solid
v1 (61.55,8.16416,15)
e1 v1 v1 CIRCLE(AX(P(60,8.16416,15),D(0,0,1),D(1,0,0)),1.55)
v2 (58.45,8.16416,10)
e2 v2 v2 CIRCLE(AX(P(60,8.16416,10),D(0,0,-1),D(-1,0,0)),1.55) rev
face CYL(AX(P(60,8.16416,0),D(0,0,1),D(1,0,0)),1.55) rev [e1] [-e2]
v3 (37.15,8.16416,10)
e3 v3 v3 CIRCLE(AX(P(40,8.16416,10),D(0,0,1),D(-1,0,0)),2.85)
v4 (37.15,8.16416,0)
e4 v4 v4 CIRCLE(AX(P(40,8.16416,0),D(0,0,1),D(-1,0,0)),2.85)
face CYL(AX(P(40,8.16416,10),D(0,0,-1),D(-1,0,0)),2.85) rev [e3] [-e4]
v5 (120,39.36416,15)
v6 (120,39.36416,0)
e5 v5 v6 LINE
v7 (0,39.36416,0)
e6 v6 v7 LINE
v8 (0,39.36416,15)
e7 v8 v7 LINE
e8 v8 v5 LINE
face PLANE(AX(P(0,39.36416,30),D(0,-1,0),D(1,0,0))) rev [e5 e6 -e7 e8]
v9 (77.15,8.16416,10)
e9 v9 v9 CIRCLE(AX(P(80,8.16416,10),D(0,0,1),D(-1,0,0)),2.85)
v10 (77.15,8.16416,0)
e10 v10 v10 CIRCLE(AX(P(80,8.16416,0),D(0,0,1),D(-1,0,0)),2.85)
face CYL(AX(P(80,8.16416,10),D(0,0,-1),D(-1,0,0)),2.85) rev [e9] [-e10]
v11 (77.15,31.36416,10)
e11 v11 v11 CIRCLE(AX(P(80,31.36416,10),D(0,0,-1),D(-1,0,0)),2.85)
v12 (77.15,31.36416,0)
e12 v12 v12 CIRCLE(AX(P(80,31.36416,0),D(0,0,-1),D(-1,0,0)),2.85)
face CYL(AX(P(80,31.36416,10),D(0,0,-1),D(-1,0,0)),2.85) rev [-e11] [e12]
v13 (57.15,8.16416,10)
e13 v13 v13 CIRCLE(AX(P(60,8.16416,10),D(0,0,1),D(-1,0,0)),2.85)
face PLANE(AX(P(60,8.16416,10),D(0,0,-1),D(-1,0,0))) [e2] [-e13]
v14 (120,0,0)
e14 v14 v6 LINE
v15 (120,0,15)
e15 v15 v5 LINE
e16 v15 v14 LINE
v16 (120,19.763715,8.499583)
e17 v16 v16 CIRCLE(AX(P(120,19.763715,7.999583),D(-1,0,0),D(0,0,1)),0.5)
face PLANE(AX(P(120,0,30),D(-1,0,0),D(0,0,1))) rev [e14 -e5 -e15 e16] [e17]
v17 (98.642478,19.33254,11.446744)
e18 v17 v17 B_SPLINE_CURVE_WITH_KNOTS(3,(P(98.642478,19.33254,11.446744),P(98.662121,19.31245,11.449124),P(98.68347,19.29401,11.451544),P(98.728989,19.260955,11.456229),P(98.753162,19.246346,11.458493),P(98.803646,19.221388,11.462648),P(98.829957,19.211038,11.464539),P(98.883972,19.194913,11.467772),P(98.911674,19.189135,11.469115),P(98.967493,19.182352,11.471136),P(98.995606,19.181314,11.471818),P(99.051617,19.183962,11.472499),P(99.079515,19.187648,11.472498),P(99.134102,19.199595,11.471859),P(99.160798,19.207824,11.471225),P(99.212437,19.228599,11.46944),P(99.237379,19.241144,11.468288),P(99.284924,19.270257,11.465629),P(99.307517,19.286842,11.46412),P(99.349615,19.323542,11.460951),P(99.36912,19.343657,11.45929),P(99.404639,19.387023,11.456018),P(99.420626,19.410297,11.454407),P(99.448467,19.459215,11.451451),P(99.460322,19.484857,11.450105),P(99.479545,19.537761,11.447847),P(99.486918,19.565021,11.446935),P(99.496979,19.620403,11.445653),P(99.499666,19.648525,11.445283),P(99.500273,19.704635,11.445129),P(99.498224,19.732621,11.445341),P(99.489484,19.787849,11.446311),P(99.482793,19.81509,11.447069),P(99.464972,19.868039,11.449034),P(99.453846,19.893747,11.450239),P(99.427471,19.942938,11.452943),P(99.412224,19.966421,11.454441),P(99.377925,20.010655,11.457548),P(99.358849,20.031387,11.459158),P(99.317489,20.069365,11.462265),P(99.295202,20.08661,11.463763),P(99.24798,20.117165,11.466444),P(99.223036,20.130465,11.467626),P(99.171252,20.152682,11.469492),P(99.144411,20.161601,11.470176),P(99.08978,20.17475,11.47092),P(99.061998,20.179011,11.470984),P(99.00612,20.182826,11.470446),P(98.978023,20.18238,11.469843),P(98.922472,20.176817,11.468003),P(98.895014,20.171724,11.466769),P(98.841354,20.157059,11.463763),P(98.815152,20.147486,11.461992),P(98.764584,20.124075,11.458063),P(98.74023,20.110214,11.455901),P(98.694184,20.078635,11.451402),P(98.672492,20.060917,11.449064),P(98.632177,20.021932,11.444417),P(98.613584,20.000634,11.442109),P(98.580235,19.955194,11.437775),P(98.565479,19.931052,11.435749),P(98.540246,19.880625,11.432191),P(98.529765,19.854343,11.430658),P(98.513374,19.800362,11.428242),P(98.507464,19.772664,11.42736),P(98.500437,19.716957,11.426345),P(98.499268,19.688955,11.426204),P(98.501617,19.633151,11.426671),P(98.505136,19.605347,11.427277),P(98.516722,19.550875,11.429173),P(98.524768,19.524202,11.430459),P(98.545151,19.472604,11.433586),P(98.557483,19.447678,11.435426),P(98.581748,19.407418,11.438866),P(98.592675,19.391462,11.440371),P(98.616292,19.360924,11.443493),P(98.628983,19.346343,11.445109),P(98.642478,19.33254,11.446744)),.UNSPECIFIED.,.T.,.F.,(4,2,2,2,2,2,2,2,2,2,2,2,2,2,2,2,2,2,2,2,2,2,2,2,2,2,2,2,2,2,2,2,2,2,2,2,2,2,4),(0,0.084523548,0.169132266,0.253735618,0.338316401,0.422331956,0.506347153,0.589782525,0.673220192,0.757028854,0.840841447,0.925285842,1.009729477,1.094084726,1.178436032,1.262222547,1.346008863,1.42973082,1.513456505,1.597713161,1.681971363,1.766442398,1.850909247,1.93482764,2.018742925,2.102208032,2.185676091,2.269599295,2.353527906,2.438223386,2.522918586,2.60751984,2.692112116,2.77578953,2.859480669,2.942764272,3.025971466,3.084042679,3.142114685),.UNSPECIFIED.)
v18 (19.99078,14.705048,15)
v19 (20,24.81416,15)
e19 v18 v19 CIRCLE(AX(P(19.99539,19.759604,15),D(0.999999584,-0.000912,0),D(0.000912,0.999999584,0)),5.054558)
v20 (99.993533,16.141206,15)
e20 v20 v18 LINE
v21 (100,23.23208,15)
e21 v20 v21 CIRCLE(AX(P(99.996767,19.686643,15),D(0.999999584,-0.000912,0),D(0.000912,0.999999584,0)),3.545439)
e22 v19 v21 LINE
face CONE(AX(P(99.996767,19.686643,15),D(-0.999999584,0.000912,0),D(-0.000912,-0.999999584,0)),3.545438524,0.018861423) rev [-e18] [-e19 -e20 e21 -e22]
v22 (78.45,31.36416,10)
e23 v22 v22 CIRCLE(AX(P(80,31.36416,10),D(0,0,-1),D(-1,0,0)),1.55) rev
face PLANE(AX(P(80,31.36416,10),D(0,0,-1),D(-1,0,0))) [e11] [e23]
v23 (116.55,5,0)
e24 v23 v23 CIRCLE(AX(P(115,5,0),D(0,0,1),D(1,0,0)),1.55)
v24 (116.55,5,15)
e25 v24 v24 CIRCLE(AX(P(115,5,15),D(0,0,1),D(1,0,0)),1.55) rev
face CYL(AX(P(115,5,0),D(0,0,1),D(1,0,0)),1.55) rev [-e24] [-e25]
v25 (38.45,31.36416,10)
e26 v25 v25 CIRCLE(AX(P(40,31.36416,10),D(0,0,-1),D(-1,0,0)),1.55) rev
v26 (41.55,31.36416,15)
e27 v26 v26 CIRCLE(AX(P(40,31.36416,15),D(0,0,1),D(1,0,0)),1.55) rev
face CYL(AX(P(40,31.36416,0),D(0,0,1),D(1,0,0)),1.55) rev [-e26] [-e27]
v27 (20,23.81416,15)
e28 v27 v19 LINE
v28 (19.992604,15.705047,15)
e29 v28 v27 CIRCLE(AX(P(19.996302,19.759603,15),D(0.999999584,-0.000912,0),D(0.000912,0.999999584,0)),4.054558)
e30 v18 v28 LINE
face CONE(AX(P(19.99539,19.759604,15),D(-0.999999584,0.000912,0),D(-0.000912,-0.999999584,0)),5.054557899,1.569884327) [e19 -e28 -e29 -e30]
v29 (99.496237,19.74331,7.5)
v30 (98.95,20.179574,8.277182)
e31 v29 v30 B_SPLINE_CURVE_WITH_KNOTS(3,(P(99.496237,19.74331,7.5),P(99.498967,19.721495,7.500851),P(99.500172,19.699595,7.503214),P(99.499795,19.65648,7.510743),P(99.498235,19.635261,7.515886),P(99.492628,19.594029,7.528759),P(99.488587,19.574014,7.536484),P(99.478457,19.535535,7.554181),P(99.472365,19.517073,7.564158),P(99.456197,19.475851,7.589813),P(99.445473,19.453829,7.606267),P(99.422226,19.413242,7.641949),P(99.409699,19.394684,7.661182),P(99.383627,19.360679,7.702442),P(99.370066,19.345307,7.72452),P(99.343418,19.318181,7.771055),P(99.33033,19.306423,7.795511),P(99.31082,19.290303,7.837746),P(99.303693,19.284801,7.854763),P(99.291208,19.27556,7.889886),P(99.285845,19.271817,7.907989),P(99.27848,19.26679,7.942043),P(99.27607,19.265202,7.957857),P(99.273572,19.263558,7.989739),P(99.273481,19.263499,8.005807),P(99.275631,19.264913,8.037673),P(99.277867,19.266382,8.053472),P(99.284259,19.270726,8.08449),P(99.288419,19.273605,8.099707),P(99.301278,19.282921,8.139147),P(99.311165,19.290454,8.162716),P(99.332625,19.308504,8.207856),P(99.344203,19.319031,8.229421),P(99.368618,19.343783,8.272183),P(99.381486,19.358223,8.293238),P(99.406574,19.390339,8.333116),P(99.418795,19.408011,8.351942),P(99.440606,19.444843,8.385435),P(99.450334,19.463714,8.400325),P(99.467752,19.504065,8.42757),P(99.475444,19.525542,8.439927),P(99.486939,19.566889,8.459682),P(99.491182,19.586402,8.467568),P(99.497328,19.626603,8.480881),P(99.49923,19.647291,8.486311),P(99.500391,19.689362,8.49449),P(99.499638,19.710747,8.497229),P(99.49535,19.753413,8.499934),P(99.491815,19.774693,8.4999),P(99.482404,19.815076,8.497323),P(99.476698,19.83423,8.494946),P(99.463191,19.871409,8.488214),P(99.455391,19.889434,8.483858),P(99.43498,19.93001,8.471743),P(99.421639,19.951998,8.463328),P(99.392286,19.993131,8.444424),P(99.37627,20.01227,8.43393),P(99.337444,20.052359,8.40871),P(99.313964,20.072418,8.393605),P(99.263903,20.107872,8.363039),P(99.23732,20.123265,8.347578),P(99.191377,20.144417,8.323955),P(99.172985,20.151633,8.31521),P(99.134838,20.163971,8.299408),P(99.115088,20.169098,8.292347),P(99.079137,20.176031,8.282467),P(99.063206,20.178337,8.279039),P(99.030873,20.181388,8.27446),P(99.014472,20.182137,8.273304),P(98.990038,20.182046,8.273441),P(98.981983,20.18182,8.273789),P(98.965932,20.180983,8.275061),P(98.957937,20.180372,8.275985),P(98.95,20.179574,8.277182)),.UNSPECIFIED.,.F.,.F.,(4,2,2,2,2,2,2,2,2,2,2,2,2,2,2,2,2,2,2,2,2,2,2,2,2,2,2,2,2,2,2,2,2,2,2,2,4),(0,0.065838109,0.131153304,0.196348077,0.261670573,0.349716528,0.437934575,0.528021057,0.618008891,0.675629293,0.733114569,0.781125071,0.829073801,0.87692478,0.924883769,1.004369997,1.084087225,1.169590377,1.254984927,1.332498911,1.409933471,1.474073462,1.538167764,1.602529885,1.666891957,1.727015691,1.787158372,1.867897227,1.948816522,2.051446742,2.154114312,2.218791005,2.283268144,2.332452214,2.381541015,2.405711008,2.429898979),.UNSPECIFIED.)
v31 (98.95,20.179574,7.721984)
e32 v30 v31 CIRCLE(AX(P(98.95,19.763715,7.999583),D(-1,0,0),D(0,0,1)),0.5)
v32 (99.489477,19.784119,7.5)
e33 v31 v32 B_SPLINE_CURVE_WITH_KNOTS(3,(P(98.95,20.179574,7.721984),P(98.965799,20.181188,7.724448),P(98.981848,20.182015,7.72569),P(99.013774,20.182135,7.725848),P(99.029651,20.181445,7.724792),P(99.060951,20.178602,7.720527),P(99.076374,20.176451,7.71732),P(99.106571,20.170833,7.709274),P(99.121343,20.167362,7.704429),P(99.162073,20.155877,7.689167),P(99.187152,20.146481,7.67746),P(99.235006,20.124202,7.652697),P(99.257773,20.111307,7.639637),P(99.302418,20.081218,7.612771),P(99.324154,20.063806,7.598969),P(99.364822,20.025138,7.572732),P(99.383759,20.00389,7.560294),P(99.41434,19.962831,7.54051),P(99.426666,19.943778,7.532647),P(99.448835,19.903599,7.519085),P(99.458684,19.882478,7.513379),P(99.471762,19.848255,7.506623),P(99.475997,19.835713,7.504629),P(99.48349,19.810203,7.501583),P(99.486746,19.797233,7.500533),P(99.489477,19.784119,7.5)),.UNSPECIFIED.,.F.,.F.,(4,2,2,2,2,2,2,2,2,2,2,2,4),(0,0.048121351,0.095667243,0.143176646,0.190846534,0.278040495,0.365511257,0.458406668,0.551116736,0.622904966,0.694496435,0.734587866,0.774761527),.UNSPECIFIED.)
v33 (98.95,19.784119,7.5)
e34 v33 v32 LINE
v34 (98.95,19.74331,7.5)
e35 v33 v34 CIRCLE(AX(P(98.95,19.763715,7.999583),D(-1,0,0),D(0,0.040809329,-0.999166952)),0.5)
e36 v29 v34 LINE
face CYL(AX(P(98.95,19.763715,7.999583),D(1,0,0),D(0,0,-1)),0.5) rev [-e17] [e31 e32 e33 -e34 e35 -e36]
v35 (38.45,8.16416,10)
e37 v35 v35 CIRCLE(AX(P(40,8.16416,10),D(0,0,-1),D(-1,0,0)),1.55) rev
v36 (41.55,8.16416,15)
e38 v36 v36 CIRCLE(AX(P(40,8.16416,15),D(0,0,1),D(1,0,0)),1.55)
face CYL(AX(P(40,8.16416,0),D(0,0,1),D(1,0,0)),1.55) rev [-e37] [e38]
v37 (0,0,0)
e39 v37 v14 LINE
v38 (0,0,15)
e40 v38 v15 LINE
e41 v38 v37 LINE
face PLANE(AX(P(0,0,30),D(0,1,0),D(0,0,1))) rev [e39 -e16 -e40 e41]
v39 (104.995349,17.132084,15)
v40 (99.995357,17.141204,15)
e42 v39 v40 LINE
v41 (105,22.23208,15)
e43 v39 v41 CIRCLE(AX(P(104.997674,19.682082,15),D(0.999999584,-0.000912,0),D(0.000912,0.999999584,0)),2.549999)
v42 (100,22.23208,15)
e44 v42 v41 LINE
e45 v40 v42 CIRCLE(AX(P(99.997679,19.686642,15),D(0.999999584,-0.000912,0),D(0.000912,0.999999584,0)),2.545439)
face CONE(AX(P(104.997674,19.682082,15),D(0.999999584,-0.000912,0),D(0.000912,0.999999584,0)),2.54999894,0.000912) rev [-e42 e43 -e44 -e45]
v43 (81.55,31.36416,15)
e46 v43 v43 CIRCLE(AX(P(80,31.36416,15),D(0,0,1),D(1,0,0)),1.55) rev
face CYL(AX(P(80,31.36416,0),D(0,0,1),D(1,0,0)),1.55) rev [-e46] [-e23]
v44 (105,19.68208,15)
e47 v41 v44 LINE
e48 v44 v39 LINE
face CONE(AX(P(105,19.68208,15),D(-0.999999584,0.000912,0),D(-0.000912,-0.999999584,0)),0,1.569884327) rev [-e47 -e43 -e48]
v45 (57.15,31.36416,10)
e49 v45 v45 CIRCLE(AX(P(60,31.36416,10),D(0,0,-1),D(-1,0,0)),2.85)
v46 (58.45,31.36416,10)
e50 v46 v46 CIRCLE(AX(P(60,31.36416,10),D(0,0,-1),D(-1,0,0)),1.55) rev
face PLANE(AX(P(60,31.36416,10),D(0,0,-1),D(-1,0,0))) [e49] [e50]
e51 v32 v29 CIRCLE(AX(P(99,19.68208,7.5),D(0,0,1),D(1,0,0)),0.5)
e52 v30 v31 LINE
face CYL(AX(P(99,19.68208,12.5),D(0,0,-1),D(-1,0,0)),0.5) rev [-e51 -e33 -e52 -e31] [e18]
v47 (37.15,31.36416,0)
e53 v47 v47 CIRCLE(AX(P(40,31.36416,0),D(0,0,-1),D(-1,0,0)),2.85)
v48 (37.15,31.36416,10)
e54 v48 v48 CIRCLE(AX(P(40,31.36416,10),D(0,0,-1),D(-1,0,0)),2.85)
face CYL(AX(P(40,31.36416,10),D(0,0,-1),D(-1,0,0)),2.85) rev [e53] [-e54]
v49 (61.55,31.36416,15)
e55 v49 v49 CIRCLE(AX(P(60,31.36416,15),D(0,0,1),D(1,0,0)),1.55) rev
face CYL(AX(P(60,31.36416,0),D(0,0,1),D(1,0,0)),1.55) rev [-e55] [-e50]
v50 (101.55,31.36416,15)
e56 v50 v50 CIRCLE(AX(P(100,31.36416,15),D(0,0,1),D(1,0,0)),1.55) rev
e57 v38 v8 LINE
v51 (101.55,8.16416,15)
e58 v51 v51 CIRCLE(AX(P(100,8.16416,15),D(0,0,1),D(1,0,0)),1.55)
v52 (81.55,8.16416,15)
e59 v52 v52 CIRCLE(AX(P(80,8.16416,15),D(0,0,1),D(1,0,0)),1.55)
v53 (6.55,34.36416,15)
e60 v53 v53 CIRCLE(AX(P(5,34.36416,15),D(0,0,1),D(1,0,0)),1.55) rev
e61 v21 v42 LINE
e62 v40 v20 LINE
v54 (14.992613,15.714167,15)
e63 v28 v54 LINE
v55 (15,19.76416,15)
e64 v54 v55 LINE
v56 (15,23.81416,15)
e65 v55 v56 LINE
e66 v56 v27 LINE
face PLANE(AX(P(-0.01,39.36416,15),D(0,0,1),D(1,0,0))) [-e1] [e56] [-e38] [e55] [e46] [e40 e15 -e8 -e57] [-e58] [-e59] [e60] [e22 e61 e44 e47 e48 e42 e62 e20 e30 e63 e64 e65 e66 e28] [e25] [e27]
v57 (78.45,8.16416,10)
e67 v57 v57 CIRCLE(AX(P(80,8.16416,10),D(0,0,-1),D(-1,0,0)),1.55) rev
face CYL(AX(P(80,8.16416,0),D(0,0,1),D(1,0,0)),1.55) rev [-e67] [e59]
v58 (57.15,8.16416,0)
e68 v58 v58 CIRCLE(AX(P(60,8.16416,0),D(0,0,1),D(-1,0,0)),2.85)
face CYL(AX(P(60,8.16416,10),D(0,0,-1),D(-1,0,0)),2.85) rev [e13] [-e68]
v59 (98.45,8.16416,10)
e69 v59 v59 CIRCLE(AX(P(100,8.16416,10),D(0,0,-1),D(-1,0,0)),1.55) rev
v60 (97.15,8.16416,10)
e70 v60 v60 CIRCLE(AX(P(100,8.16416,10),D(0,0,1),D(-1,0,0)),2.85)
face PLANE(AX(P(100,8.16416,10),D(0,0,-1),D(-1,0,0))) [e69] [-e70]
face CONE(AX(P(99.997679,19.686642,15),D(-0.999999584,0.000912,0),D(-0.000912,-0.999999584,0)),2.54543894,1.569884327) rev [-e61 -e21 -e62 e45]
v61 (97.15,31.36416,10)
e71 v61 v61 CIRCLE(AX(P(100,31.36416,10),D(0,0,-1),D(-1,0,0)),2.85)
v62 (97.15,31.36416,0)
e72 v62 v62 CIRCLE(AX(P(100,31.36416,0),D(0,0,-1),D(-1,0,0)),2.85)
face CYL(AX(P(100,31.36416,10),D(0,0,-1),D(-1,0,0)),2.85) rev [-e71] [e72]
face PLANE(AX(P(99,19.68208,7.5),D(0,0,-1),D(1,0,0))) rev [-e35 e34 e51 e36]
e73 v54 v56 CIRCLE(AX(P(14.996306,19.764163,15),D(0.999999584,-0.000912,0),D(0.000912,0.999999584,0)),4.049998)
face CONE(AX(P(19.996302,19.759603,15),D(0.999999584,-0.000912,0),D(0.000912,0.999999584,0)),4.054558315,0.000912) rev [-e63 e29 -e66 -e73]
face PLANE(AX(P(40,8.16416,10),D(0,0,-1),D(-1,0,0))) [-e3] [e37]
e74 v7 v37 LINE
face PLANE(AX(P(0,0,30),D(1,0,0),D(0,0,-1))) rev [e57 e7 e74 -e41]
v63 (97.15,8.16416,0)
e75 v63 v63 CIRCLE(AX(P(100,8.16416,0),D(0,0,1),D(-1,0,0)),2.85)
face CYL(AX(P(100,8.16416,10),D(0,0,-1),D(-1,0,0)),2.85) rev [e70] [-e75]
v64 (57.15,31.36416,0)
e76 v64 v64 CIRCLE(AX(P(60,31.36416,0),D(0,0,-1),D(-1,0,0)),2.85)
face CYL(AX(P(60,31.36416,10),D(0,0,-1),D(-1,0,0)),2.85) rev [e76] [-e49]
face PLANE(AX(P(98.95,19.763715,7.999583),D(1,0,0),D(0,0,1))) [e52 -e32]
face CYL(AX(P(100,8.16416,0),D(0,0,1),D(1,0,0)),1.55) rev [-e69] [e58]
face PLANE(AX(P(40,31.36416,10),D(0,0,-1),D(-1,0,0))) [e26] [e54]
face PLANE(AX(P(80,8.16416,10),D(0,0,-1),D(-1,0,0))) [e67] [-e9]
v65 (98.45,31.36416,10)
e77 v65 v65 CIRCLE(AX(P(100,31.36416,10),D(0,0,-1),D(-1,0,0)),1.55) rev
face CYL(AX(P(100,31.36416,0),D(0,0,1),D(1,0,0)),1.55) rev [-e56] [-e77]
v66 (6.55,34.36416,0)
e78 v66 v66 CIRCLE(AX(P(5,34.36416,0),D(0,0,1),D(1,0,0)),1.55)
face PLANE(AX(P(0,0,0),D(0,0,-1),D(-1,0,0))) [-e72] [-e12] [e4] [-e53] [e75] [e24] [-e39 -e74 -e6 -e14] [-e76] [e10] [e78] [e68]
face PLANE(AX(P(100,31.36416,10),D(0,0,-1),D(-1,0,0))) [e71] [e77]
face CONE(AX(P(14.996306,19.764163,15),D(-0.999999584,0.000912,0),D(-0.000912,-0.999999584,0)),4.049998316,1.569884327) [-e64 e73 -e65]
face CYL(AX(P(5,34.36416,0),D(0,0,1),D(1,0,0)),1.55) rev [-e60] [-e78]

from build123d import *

# Parameters (mm, degrees)
SKIZZE2_W                        = 120
SKIZZE2_H                        = 39.364160046
AUFSATZ_LINEAR_AUSTRAGEN1_DEPTH  = 30
SKIZZE24_R                       = 1.55
SCHNITT_LINEAR_AUSTRAGEN4_DEPTH  = 130.805766806
SKIZZE46_R                       = 2.85
SCHNITT_LINEAR_AUSTRAGEN15_DEPTH = 10
SCHNITT_LINEAR_START             = -5
SCHNITT_LINEAR_AUSTRAGEN25_DEPTH = 2.7
LINEARES_MUSTER1_COUNT           = 4
LINEARES_MUSTER1_PITCH           = 20
SPIEGELN2_COPY_1_SKETCH_R        = 2.85
SPIEGELN2_COPY_1_DEPTH           = 10
SPIEGELN2_COPY_2_SKETCH_R        = 2.85
SPIEGELN2_COPY_2_DEPTH           = 10
SPIEGELN2_COPY_3_SKETCH_R        = 2.85
SPIEGELN2_COPY_3_DEPTH           = 10
SPIEGELN2_START                  = -5
SPIEGELN2_COPY_4_DEPTH           = 2.7
SPIEGELN2_COPY_5_DEPTH           = 2.7
SPIEGELN2_COPY_6_DEPTH           = 2.7
SKIZZE51_R                       = 1.55
SCHNITT_LINEAR_AUSTRAGEN26_DEPTH = 130.805766806
SKIZZE75_R                       = 0.75
SCHNITT_LINEAR_AUSTRAGEN28_DEPTH = 12
SKIZZE76_R                       = 2
SCHNITT_LINEAR_AUSTRAGEN29_DEPTH = 6
SKIZZE80_R                       = 0.5
SCHNITT_LINEAR_AUSTRAGEN34_DEPTH = 21.05
SCHNITT_LINEAR_START_2           = -7.5
SKIZZE81_R                       = 0.5
SCHNITT_LINEAR_AUSTRAGEN36_DEPTH = 5
FASE1_SIZE                       = 1
ABSPALTEN3_START                 = 15
ABSPALTEN3_OUTLINE_W             = 120
ABSPALTEN3_OUTLINE_H             = 39.364160046
ABSPALTEN3_OUTLINE_R             = 1.55
ABSPALTEN3_OUTLINE_R_2           = 0.75
ABSPALTEN3_DEPTH                 = 15


# Read off the part's stored shape, not the designer's step: Abspalten3
with BuildPart() as part:
    # Skizze2 → Aufsatz-Linear austragen1 (new body)
    with BuildSketch(Plane.XY):
        with Locations((60, 19.682080023)):
            Rectangle(SKIZZE2_W, SKIZZE2_H)
    extrude(amount=AUFSATZ_LINEAR_AUSTRAGEN1_DEPTH)

    # Skizze24 → Schnitt-Linear austragen4 (cut, through all)
    with BuildSketch(Plane.XY.offset(30)):
        with Locations((40, 31.364160046)):
            Circle(SKIZZE24_R)
        with Locations((60, 31.364160046)):
            Circle(SKIZZE24_R)
        with Locations((80, 31.364160046)):
            Circle(SKIZZE24_R)
        with Locations((100, 31.364160046)):
            Circle(SKIZZE24_R)
    schnitt_linear_austragen4 = extrude(amount=-SCHNITT_LINEAR_AUSTRAGEN4_DEPTH, mode=Mode.SUBTRACT)

    # Skizze46 → Schnitt-Linear austragen15 (cut)
    with BuildSketch(Plane(origin=(0, 0, 0), x_dir=(-1, 0, 0), z_dir=(0, 0, -1))):
        with Locations((-100, 31.364160046)):
            Circle(SKIZZE46_R)
    schnitt_linear_austragen15 = extrude(amount=-SCHNITT_LINEAR_AUSTRAGEN15_DEPTH, mode=Mode.SUBTRACT)

    # Skizze50 → Schnitt-Linear austragen25 (cut)
    with BuildSketch(Plane.XY.offset(30).offset(SCHNITT_LINEAR_START)):
        Polygon((97.15, 33.009608314), (97.15, 39.364160046), (102.85, 39.364160046), (102.85, 33.009608314), (102.85, 29.718711779), (100, 28.073263512), (97.15, 29.718711779), align=None)
    schnitt_linear_austragen25 = extrude(amount=-SCHNITT_LINEAR_AUSTRAGEN25_DEPTH, mode=Mode.SUBTRACT)

    # Lineares Muster1: Schnitt-Linear austragen15, Schnitt-Linear austragen25 ×4
    with Locations(*[(-i * LINEARES_MUSTER1_PITCH, 0, 0) for i in range(1, LINEARES_MUSTER1_COUNT)]):
        add(schnitt_linear_austragen15, mode=Mode.SUBTRACT)
        add(schnitt_linear_austragen25, mode=Mode.SUBTRACT)

    # Spiegeln2: Schnitt-Linear austragen15, Schnitt-Linear austragen25 across plane
    add(schnitt_linear_austragen15.mirror(Plane.ZX.offset(19.764160046)), mode=Mode.SUBTRACT)
    add(schnitt_linear_austragen25.mirror(Plane.ZX.offset(19.764160046)), mode=Mode.SUBTRACT)

    # Spiegeln2 copy 1 sketch → Spiegeln2 copy 1 (cut)
    with BuildSketch(Plane(origin=(-20, 39.528320093, 0), x_dir=(-1, 0, 0), z_dir=(0, 0, -1))):
        with Locations((-100, -31.364160046)):
            Circle(SPIEGELN2_COPY_1_SKETCH_R)
    extrude(amount=-SPIEGELN2_COPY_1_DEPTH, mode=Mode.SUBTRACT)

    # Spiegeln2 copy 2 sketch → Spiegeln2 copy 2 (cut)
    with BuildSketch(Plane(origin=(-40, 39.528320093, 0), x_dir=(-1, 0, 0), z_dir=(0, 0, -1))):
        with Locations((-100, -31.364160046)):
            Circle(SPIEGELN2_COPY_2_SKETCH_R)
    extrude(amount=-SPIEGELN2_COPY_2_DEPTH, mode=Mode.SUBTRACT)

    # Spiegeln2 copy 3 sketch → Spiegeln2 copy 3 (cut)
    with BuildSketch(Plane(origin=(-60, 39.528320093, 0), x_dir=(-1, 0, 0), z_dir=(0, 0, -1))):
        with Locations((-100, -31.364160046)):
            Circle(SPIEGELN2_COPY_3_SKETCH_R)
    extrude(amount=-SPIEGELN2_COPY_3_DEPTH, mode=Mode.SUBTRACT)

    # Spiegeln2 copy 4 sketch → Spiegeln2 copy 4 (cut)
    with BuildSketch(Plane(origin=(-20, 39.528320093, 30), x_dir=(1, 0, 0), z_dir=(0, 0, 1)).offset(SPIEGELN2_START)):
        Polygon((97.15, -33.009608314), (97.15, -39.364160046), (102.85, -39.364160046), (102.85, -33.009608314), (102.85, -29.718711779), (100, -28.073263512), (97.15, -29.718711779), align=None)
    extrude(amount=-SPIEGELN2_COPY_4_DEPTH, mode=Mode.SUBTRACT)

    # Spiegeln2 copy 5 sketch → Spiegeln2 copy 5 (cut)
    with BuildSketch(Plane(origin=(-40, 39.528320093, 30), x_dir=(1, 0, 0), z_dir=(0, 0, 1)).offset(SPIEGELN2_START)):
        Polygon((97.15, -33.009608314), (97.15, -39.364160046), (102.85, -39.364160046), (102.85, -33.009608314), (102.85, -29.718711779), (100, -28.073263512), (97.15, -29.718711779), align=None)
    extrude(amount=-SPIEGELN2_COPY_5_DEPTH, mode=Mode.SUBTRACT)

    # Spiegeln2 copy 6 sketch → Spiegeln2 copy 6 (cut)
    with BuildSketch(Plane(origin=(-60, 39.528320093, 30), x_dir=(1, 0, 0), z_dir=(0, 0, 1)).offset(SPIEGELN2_START)):
        Polygon((97.15, -33.009608314), (97.15, -39.364160046), (102.85, -39.364160046), (102.85, -33.009608314), (102.85, -29.718711779), (100, -28.073263512), (97.15, -29.718711779), align=None)
    extrude(amount=-SPIEGELN2_COPY_6_DEPTH, mode=Mode.SUBTRACT)

    # Spiegeln3: Schnitt-Linear austragen4 across plane
    add(schnitt_linear_austragen4.mirror(Plane.ZX.offset(19.764160046)), mode=Mode.SUBTRACT)

    # Skizze51 → Schnitt-Linear austragen26 (cut, through all)
    with BuildSketch(Plane.XY.offset(30)):
        with Locations((5, 34.364160046)):
            Circle(SKIZZE51_R)
        with Locations((115, 5)):
            Circle(SKIZZE51_R)
    extrude(amount=-SCHNITT_LINEAR_AUSTRAGEN26_DEPTH, mode=Mode.SUBTRACT)

    # Skizze73 → Schnitt-Rotation5 (revolve, cut)
    with BuildSketch(Plane.XY.offset(15)):
        Polygon((15, 19.764160046), (15, 23.814160046), (20, 23.814160046), (20, 24.814160046), (100, 23.232080023), (100, 22.232080023), (105, 22.232080023), (105, 19.682080023), align=None)
    revolve(axis=Axis((105, 19.682080023, 15), (-0.9999995841280241, 0.0009119998787298228, 0)), mode=Mode.SUBTRACT)

    # Skizze75 → Schnitt-Linear austragen28 (cut)
    with BuildSketch(Plane.XY.offset(30)):
        with Locations((21.598259807, 19.682080023)):
            Circle(SKIZZE75_R)
    extrude(amount=-SCHNITT_LINEAR_AUSTRAGEN28_DEPTH, mode=Mode.SUBTRACT)

    # Skizze76 → Schnitt-Linear austragen29 (cut)
    with BuildSketch(Plane.XY.offset(30)):
        with Locations((21.598259807, 19.682080023)):
            Circle(SKIZZE76_R)
    extrude(amount=-SCHNITT_LINEAR_AUSTRAGEN29_DEPTH, mode=Mode.SUBTRACT)

    # Skizze80 → Schnitt-Linear austragen34 (cut)
    with BuildSketch(Plane(origin=(120, 0, 0), x_dir=(0, 0, -1), z_dir=(1, 0, 0))):
        with Locations((-22.000416524, 19.763714623)):
            Circle(SKIZZE80_R)
    schnitt_linear_austragen34 = extrude(amount=-SCHNITT_LINEAR_AUSTRAGEN34_DEPTH, mode=Mode.SUBTRACT)

    # Skizze81 → Schnitt-Linear austragen36 (cut)
    with BuildSketch(Plane.XY.offset(30).offset(SCHNITT_LINEAR_START_2)):
        with Locations(Location((99, 19.682080023, 0), (0, 0, 7.034090001))):
            Circle(SKIZZE81_R)
    schnitt_linear_austragen36 = extrude(amount=-SCHNITT_LINEAR_AUSTRAGEN36_DEPTH, mode=Mode.SUBTRACT)

    # Spiegeln4: Schnitt-Linear austragen34, Schnitt-Linear austragen36 across plane
    add(schnitt_linear_austragen34.mirror(Plane.XY.offset(15)), mode=Mode.SUBTRACT)
    add(schnitt_linear_austragen36.mirror(Plane.XY.offset(15)), mode=Mode.SUBTRACT)

    # Fase1
    fase1_edges = [part.edges().sort_by_distance(p)[0] for p in [
        (20.848259807, 19.682080023, 24),
    ]]
    chamfer(fase1_edges, length=FASE1_SIZE)

    # Abspalten3 outline → Abspalten3 (cut)
    with BuildSketch(Plane.XY.offset(ABSPALTEN3_START)):
        with Locations((60, 19.682080023)):
            Rectangle(ABSPALTEN3_OUTLINE_W, ABSPALTEN3_OUTLINE_H)
        with Locations((115, 5)):
            Circle(ABSPALTEN3_OUTLINE_R, mode=Mode.SUBTRACT)
        with Locations((5, 34.364160046)):
            Circle(ABSPALTEN3_OUTLINE_R, mode=Mode.SUBTRACT)
        with Locations((40, 31.364160046)):
            Circle(ABSPALTEN3_OUTLINE_R, mode=Mode.SUBTRACT)
        with Locations((60, 31.364160046)):
            Circle(ABSPALTEN3_OUTLINE_R, mode=Mode.SUBTRACT)
        with Locations((80, 31.364160046)):
            Circle(ABSPALTEN3_OUTLINE_R, mode=Mode.SUBTRACT)
        with Locations((100, 31.364160046)):
            Circle(ABSPALTEN3_OUTLINE_R, mode=Mode.SUBTRACT)
        with Locations((40, 8.164160046)):
            Circle(ABSPALTEN3_OUTLINE_R, mode=Mode.SUBTRACT)
        with Locations((60, 8.164160046)):
            Circle(ABSPALTEN3_OUTLINE_R, mode=Mode.SUBTRACT)
        with Locations((80, 8.164160046)):
            Circle(ABSPALTEN3_OUTLINE_R, mode=Mode.SUBTRACT)
        with Locations((100, 8.164160046)):
            Circle(ABSPALTEN3_OUTLINE_R, mode=Mode.SUBTRACT)
        with Locations((21.598259807, 19.682080023)):
            Circle(ABSPALTEN3_OUTLINE_R_2, mode=Mode.SUBTRACT)
    extrude(amount=ABSPALTEN3_DEPTH, mode=Mode.SUBTRACT)


solid = part.part
